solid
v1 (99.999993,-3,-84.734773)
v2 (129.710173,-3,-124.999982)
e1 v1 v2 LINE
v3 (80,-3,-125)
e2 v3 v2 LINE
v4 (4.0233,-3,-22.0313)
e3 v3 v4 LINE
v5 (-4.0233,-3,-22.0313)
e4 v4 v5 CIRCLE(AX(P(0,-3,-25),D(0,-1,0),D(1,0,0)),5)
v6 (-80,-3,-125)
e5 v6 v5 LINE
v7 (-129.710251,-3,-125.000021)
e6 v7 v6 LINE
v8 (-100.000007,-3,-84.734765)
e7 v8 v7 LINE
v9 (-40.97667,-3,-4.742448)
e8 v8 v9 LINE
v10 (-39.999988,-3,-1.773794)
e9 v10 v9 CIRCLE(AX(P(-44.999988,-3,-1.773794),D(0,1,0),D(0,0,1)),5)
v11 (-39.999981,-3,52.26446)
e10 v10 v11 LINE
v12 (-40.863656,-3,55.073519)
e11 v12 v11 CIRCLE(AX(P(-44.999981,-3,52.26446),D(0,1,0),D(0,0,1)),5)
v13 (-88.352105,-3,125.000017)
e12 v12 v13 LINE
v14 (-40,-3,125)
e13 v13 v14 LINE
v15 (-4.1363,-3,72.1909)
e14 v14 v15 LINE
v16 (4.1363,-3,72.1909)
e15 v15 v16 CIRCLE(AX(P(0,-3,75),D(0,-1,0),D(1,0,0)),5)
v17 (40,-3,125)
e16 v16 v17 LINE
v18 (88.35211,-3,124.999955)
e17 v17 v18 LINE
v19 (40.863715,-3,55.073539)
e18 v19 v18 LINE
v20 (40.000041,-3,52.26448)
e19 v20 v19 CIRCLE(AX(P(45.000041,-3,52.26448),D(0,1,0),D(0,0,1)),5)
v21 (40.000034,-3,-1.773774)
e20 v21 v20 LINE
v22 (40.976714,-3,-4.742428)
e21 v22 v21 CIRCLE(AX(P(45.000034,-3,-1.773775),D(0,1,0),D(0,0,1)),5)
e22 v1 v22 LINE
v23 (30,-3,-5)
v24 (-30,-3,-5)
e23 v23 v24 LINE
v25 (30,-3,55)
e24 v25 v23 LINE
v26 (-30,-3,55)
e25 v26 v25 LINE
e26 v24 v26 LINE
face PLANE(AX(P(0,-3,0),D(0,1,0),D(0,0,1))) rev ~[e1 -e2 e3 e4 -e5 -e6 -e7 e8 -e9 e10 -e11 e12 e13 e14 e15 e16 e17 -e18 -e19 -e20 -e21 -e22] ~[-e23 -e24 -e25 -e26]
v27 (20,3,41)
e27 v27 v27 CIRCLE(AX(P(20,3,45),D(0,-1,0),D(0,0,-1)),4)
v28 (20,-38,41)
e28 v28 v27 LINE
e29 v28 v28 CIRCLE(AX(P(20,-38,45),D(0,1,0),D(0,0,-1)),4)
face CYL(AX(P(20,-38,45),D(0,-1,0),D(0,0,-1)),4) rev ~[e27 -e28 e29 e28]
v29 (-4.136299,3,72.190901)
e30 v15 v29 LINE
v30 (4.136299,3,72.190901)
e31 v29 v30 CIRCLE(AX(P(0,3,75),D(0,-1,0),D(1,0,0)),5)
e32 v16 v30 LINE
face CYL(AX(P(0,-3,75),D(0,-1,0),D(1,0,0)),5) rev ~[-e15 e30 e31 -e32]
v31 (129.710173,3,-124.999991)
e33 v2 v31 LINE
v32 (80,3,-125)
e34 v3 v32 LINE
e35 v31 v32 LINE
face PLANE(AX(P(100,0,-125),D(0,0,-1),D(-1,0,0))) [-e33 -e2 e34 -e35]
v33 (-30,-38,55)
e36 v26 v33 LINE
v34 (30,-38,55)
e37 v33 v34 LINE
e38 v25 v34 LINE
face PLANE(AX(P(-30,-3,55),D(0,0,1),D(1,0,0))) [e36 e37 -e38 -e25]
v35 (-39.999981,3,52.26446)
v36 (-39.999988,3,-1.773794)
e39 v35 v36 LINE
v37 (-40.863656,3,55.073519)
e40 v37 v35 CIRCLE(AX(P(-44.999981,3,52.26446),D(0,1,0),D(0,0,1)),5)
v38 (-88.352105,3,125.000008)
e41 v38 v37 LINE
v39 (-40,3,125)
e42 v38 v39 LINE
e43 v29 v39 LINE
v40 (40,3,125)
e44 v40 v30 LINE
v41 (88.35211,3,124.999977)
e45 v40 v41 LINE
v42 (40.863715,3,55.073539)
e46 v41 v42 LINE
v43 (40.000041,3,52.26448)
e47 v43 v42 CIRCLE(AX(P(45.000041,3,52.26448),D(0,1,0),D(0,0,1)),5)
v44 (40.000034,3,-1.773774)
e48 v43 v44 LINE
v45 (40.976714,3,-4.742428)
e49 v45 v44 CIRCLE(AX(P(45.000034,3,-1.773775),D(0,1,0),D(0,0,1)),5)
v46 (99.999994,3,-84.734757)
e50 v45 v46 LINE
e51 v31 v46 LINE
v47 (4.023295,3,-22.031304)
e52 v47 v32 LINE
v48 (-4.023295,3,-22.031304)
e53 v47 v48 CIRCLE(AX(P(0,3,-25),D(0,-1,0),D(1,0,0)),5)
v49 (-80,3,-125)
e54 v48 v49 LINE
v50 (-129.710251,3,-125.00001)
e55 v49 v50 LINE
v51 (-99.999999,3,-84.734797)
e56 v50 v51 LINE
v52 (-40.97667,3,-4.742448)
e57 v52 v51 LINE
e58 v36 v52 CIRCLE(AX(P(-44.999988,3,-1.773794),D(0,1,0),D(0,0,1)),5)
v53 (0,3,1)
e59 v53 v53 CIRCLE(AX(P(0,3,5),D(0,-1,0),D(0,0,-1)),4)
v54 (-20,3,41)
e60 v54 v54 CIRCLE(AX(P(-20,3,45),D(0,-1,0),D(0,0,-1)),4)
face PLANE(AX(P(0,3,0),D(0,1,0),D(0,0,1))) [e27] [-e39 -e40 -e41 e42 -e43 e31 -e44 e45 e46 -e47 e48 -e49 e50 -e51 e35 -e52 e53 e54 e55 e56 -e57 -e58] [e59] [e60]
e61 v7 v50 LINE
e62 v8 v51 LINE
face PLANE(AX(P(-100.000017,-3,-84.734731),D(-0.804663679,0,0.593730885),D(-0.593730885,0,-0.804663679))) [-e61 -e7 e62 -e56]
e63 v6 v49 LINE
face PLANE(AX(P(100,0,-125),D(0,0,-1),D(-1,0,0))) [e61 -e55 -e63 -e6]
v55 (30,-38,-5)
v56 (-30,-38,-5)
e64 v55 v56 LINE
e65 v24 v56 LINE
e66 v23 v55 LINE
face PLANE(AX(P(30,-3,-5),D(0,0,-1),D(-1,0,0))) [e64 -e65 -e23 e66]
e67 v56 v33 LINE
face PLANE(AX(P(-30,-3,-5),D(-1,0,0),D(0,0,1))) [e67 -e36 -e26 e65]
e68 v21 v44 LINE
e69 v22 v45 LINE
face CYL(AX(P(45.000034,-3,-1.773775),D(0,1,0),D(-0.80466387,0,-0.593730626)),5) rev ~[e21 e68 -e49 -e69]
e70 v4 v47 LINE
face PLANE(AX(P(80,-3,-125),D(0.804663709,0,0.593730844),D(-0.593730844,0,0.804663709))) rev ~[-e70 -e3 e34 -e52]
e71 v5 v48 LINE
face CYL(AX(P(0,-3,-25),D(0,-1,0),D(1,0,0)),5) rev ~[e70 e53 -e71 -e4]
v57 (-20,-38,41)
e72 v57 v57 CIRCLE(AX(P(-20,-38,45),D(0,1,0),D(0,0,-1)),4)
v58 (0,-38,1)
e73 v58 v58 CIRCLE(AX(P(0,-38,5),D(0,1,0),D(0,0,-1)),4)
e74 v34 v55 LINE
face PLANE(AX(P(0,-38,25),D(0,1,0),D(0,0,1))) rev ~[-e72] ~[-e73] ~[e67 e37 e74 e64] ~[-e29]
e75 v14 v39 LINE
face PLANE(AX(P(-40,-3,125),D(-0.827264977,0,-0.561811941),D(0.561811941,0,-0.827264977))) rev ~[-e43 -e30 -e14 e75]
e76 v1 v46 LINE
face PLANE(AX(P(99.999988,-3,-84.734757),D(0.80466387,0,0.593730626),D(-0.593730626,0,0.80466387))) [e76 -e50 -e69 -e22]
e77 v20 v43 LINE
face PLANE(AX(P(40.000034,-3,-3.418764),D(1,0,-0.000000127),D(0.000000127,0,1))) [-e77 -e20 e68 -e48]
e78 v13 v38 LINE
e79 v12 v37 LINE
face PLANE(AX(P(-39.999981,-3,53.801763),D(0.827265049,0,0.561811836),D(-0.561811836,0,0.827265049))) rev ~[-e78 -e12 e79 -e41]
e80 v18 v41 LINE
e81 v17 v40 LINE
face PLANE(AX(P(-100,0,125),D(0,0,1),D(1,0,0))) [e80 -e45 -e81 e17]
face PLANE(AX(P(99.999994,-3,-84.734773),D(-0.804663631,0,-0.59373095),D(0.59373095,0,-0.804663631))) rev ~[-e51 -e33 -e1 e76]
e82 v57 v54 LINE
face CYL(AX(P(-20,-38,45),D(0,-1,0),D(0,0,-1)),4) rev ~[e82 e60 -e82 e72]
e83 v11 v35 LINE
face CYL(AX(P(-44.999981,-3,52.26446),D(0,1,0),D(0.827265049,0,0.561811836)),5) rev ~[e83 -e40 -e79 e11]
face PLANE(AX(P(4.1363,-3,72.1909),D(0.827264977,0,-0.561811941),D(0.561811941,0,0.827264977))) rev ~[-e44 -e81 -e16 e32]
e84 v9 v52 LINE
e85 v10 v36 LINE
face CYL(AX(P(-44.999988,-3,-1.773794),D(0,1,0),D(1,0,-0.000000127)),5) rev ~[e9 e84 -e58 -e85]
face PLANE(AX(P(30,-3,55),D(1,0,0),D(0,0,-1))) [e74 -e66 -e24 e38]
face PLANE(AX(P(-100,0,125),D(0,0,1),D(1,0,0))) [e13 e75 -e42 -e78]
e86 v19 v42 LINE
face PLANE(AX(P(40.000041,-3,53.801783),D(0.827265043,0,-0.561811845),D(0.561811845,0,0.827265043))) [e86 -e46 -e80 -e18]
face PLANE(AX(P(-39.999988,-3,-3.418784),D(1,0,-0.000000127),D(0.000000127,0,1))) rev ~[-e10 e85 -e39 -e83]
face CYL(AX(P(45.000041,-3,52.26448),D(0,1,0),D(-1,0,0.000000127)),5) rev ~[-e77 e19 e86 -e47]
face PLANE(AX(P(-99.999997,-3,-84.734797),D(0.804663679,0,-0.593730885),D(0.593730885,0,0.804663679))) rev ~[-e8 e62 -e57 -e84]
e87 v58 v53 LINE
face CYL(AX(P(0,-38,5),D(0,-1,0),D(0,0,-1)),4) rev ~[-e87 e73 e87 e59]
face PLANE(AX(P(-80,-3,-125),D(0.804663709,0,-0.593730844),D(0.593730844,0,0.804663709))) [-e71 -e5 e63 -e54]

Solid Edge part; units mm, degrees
sketch "Sketch1" plane through (0, 0, 0) normal (0, -1, 0) x (1, 0, 0)
  line L0 (-100, 125) -> (100, 125)
  line L1 (100, 125) -> (100, -125)
  line L2 (100, -125) -> (-100, -125)
  line L3 (-100, -125) -> (-100, 125)
  dimension "D1" = 250
  dimension "D2" = 200
extrude "Protrusion1" add sketch "Sketch1" along normal mid plane 6
sketch "Sketch2" plane through (0, -3, 0) normal (0, -1, 0) x (1, 0, 0)
  line L0 (-30, 55) -> (30, 55)
  line L1 (30, 55) -> (30, -5)
  line L2 (30, -5) -> (-30, -5)
  line L3 (-30, -5) -> (-30, 55)
  dimension "D1" = 60
  dimension "D2" = 60
  dimension "D3" = 120
  dimension "D4" = 70
extrude "Ausprägung_2" add sketch "Sketch2" along normal blind 35
hole "Bohrung_4" at (20, -38, 45) direction (0, 1, 0) diameter 8 end up to next
hole "Hole1" at (0, -38, 5) direction (0, 1, 0) diameter 8 end up to next
hole "Hole2" at (-20, -38, 45) direction (0, 1, 0) diameter 8 end up to next
sketch "Sketch3" plane through (0, -3, 0) normal (0, -1, 0) x (1, 0, 0)
  circle A0 centre (0, -25) radius 5
  dimension "D1" = 10
  dimension "D2" = 100
extrude "Ausschnitt_1" cut sketch "Sketch3" against normal blind 469.9
sketch "Sketch4" plane through (0, -3, 0) normal (0, -1, 0) x (1, 0, 0)
  line L0 (-4.0233, -22.0313) -> (4.0233, -22.0313)
  line L1 (-80, -125) -> (-4.0233, -22.0313)
  line L2 (-80, -125) -> (80, -125)
  line L3 (80, -125) -> (4.0233, -22.0313)
  dimension "D1" = 160
  dimension "D2" = 20
extrude "Ausschnitt_3" cut sketch "Sketch4" against normal blind 320.675
sketch "Sketch5" plane through (0, -3, 0) normal (0, -1, 0) x (1, 0, 0)
  circle A0 centre (0, 75) radius 5
  dimension "D1" = 10
  dimension "D2" = 20
extrude "Ausschnitt_4" cut sketch "Sketch5" against normal blind 250.825
sketch "Sketch6" plane through (0, -3, 0) normal (0, -1, 0) x (1, 0, 0)
  line L0 (-40, 125) -> (-4.1363, 72.1909)
  line L1 (-4.1363, 72.1909) -> (4.1363, 72.1909)
  line L2 (4.1363, 72.1909) -> (40, 125)
  line L3 (40, 125) -> (-40, 125)
  dimension "D1" = 80
  dimension "D2" = 60
extrude "Ausschnitt_5" cut sketch "Sketch6" against normal blind 673.1
sketch "Sketch7" plane through (0, -3, 0) normal (0, -1, 0) x (0.5937309, 0, 0.8046637)
  line L0 (-127.5561, 30.1567) -> (-26.5002, 30.1567)
  line L1 (-26.5002, 30.1567) -> (19.5431, 64.1303)
  line L2 (19.5431, 64.1303) -> (48.1256, 145.3101)
  line L3 (48.1256, 145.3101) -> (48.1256, 179.0397)
  line L4 (48.1256, 179.0397) -> (-141.6388, 49.5277)
  line L5 (-141.6388, 49.5277) -> (-127.5561, 30.1567)
  dimension "D1" = 127.5561
extrude "Ausschnitt_6" cut sketch "Sketch7" against normal blind 1343.025
sketch "Sketch8" plane through (0, -3, 0) normal (0, -1, 0) x (0.5937309, 0, 0.8046637)
  line L0 (-8.8099, -130.776) -> (20.9983, -34.2164)
  line L1 (20.9983, -34.2164) -> (67.0416, -0.2428)
  line L2 (67.0416, -0.2428) -> (153.0403, 3.1226)
  line L3 (153.0403, 3.1226) -> (159.956, -6.25)
  line L4 (159.956, -6.25) -> (-8.8099, -130.776)
extrude "Ausschnitt_8" cut sketch "Sketch8" against normal blind 660.4
sketch "Sketch9" plane through (100, 0, -104.8674) normal (1, 0, 0) x (0, 0, -1)
  line L0 (-20.1326, 3) -> (20.1326, 3)
  line L1 (20.1326, 3) -> (20.1326, -3)
  line L2 (20.1326, -3) -> (-20.1326, -3)
  line L3 (-20.1326, -3) -> (-20.1326, 3)
  dimension "D1" = 40.2653
  dimension "D2" = 6
extrude "Ausprägung_4" add sketch "Sketch9" along normal blind 35
sketch "Sketch10" plane through (17.5, -3, 0) normal (0, -1, 0) x (-0.5937309, 0, -0.8046637)
  line L0 (19.2002, 116.6944) -> (33.9603, 164.5078)
  line L1 (33.9603, 164.5078) -> (30.8196, 168.7643)
  line L2 (30.8196, 168.7643) -> (-1.5804, 144.8576)
  line L3 (-1.5804, 144.8576) -> (19.2002, 116.6944)
extrude "Ausschnitt_9" cut sketch "Sketch10" against normal blind 101.6
sketch "Sketch11" plane through (-100, 0, -104.8674) normal (-1, 0, 0) x (0, 0, -1)
  line L0 (-20.1326, 3) -> (20.1326, 3)
  line L1 (20.1326, 3) -> (20.1326, -3)
  line L2 (20.1326, -3) -> (-20.1326, -3)
  line L3 (-20.1326, -3) -> (-20.1326, 3)
extrude "Ausprägung_5" add sketch "Sketch11" along normal blind 35
sketch "Sketch12" plane through (-2.6449, -3, 0) normal (0, -1, 0) x (-0.5937309, 0, -0.8046637)
  line L0 (125.9857, -28.0285) -> (176.0256, -28.0285)
  line L1 (176.0256, -28.0285) -> (179.1663, -32.285)
  line L2 (179.1663, -32.285) -> (146.7663, -56.1917)
  line L3 (146.7663, -56.1917) -> (125.9857, -28.0285)
extrude "Ausschnitt_10" cut sketch "Sketch12" against normal blind 34.925
fillet "Verrundung_4" radius 5 4 edges at (40, 0, -3.4188) (40, 0, 53.8018) (-40, 0, -3.4188) (-40, 0, 53.8018)
properties material "Aluminium, 1060"
